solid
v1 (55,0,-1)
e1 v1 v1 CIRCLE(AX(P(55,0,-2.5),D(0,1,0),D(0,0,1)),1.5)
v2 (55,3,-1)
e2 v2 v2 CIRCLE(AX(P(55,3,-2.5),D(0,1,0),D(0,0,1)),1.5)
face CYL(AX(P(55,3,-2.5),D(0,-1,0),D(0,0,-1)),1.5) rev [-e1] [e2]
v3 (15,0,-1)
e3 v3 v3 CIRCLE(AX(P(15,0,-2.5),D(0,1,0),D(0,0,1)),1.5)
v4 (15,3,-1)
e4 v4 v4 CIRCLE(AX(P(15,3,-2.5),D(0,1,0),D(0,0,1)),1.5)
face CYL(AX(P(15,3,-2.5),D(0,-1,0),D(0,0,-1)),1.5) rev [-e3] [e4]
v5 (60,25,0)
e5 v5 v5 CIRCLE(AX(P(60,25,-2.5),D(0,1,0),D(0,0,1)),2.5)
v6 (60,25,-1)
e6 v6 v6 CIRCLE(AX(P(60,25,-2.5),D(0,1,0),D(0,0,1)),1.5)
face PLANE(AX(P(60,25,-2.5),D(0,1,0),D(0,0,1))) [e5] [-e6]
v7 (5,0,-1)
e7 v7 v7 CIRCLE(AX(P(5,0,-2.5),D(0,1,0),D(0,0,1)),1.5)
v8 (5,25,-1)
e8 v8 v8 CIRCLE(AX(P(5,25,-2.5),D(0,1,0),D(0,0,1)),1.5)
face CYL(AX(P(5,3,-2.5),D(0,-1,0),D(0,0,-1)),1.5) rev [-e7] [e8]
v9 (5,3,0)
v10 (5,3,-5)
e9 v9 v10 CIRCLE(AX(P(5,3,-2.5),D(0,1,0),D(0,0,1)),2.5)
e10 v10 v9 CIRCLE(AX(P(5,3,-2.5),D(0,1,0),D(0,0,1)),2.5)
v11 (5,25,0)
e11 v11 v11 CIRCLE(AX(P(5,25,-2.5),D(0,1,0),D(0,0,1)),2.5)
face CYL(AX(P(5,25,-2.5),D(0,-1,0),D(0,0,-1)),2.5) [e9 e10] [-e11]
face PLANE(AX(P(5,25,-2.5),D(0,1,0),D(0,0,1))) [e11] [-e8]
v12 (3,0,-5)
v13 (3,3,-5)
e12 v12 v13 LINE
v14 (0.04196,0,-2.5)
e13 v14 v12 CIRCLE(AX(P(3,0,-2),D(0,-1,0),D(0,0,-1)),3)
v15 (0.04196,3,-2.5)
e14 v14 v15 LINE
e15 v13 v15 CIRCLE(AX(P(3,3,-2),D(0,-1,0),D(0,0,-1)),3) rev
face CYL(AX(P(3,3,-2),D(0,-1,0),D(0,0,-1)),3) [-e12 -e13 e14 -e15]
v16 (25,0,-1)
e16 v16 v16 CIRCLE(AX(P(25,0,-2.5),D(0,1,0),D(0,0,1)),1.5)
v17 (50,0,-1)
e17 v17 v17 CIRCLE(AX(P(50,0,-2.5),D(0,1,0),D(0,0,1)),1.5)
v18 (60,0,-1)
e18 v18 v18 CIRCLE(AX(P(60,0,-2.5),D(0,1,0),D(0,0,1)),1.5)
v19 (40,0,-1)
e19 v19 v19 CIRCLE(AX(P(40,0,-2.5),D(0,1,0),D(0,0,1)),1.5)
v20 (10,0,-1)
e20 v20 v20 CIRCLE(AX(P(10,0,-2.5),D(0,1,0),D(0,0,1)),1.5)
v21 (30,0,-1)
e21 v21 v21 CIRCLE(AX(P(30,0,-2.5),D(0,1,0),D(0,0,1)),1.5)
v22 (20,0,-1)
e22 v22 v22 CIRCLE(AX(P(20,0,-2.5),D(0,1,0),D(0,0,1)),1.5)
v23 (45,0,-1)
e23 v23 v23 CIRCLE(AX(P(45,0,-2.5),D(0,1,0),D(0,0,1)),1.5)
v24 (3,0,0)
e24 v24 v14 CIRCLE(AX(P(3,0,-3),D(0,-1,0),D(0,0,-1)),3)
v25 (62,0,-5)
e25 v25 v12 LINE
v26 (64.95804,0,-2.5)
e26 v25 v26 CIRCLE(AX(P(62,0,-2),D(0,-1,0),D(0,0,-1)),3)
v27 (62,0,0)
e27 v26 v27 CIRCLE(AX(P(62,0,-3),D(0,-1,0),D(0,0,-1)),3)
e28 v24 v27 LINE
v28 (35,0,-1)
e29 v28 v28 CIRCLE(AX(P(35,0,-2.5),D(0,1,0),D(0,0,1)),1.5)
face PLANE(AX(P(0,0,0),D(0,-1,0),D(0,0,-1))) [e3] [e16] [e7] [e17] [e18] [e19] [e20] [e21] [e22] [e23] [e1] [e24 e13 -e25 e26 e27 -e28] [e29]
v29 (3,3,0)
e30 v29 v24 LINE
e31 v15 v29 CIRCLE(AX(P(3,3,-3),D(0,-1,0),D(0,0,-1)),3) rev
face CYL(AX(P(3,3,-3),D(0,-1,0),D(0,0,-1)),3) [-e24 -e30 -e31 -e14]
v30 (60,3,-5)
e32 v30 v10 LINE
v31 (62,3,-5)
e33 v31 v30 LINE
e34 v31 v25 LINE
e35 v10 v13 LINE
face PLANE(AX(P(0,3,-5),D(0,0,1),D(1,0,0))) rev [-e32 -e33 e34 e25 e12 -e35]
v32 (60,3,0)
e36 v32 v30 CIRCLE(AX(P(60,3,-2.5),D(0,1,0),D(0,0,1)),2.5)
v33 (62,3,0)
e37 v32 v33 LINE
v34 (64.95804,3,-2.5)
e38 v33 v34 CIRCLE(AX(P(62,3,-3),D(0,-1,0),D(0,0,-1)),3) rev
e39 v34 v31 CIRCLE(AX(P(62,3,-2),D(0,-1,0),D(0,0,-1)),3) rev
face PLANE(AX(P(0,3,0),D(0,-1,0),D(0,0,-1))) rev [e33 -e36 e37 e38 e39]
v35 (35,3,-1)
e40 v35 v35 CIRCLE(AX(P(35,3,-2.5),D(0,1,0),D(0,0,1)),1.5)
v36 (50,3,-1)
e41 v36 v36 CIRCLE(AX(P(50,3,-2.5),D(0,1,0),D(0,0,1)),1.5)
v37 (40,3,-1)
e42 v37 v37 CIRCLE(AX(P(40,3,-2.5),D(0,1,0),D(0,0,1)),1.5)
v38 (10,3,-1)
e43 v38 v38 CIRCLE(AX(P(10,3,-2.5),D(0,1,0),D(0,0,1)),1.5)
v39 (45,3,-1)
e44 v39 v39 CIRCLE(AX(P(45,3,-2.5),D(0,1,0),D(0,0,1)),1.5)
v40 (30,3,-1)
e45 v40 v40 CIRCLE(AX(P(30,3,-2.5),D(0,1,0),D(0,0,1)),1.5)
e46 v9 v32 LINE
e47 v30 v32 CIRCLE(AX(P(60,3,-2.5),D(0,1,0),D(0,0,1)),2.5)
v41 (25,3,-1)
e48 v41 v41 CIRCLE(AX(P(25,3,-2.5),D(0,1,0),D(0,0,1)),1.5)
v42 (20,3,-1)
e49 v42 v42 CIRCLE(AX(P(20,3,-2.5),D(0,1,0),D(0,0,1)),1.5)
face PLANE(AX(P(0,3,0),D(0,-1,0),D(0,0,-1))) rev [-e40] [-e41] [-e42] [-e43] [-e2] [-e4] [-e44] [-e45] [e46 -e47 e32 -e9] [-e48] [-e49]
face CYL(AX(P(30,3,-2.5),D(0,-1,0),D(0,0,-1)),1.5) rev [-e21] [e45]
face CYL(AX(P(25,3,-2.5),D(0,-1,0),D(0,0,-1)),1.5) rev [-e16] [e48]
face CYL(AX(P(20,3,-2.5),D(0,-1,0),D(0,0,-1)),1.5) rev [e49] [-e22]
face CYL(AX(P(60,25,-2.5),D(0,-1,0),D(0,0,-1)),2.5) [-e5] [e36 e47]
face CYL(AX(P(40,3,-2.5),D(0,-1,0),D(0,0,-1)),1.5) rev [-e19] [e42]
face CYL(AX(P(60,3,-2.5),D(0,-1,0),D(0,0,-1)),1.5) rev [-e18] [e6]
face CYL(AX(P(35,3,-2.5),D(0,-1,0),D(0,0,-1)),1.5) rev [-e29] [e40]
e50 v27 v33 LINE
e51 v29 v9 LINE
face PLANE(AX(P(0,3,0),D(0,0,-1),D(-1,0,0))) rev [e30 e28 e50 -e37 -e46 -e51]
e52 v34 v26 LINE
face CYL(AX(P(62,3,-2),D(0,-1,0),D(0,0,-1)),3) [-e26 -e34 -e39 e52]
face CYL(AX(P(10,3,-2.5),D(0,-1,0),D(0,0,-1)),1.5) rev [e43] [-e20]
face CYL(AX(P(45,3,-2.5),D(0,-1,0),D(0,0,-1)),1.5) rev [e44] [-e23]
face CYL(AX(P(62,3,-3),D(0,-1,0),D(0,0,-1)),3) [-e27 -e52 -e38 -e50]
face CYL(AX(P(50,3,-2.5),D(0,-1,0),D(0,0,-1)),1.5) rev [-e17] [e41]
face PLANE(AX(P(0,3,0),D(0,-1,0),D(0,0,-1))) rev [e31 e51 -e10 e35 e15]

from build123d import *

# Parameters (mm, degrees)
SKETCH1_W           = 65
SKETCH1_H           = 5
SKETCH1_R           = 1.5
BOSS_EXTRUDE1_DEPTH = 3
SKETCH2_R           = 2.5
SKETCH2_R_2         = 1.5
BOSS_EXTRUDE2_DEPTH = 22
FILLET1_R           = 3


with BuildPart() as part:
    # Sketch1 → Boss-Extrude1 (new body)
    with BuildSketch(Plane(origin=(0, 0, 0), x_dir=(1, 0, 0), z_dir=(0, 1, 0))):
        with Locations((32.5, 2.5)):
            Rectangle(SKETCH1_W, SKETCH1_H)
        with Locations(Location((5, 2.5, 0), (0, 0, 270))):
            Circle(SKETCH1_R, mode=Mode.SUBTRACT)
        with Locations(Location((10, 2.5, 0), (0, 0, 270))):
            Circle(SKETCH1_R, mode=Mode.SUBTRACT)
        with Locations(Location((15, 2.5, 0), (0, 0, 270))):
            Circle(SKETCH1_R, mode=Mode.SUBTRACT)
        with Locations(Location((20, 2.5, 0), (0, 0, 270))):
            Circle(SKETCH1_R, mode=Mode.SUBTRACT)
        with Locations(Location((25, 2.5, 0), (0, 0, 270))):
            Circle(SKETCH1_R, mode=Mode.SUBTRACT)
        with Locations(Location((30, 2.5, 0), (0, 0, 270))):
            Circle(SKETCH1_R, mode=Mode.SUBTRACT)
        with Locations(Location((35, 2.5, 0), (0, 0, 270))):
            Circle(SKETCH1_R, mode=Mode.SUBTRACT)
        with Locations(Location((40, 2.5, 0), (0, 0, 270))):
            Circle(SKETCH1_R, mode=Mode.SUBTRACT)
        with Locations(Location((45, 2.5, 0), (0, 0, 270))):
            Circle(SKETCH1_R, mode=Mode.SUBTRACT)
        with Locations(Location((50, 2.5, 0), (0, 0, 270))):
            Circle(SKETCH1_R, mode=Mode.SUBTRACT)
        with Locations(Location((55, 2.5, 0), (0, 0, 270))):
            Circle(SKETCH1_R, mode=Mode.SUBTRACT)
        with Locations(Location((60, 2.5, 0), (0, 0, 270))):
            Circle(SKETCH1_R, mode=Mode.SUBTRACT)
    extrude(amount=BOSS_EXTRUDE1_DEPTH)

    # Sketch2 → Boss-Extrude2 (add)
    # profile 1 of 2: a face of its own
    with BuildSketch(Plane(origin=(0, 3, 0), x_dir=(1, 0, 0), z_dir=(0, 1, 0))):
        with Locations(Location((5, 2.5, 0), (0, 0, 270))):
            Circle(SKETCH2_R)
        with Locations(Location((5, 2.5, 0), (0, 0, 270))):
            Circle(SKETCH2_R_2, mode=Mode.SUBTRACT)
    # profile 2 of 2: a face of its own
    with BuildSketch(Plane(origin=(0, 3, 0), x_dir=(1, 0, 0), z_dir=(0, 1, 0))):
        with Locations(Location((60, 2.5, 0), (0, 0, 270))):
            Circle(SKETCH2_R)
        with Locations(Location((60, 2.5, 0), (0, 0, 270))):
            Circle(SKETCH2_R_2, mode=Mode.SUBTRACT)
    extrude(amount=BOSS_EXTRUDE2_DEPTH)

    # Fillet1
    # the kernel refuses this fillet: 3 mm, written as the material it takes off along each edge
    with BuildSketch(Plane(origin=(65, -7.5, -5), x_dir=(-1, 0, 0), z_dir=(0, 1, 0)), Plane(origin=(0, -7.5, 0), x_dir=(1, 0, 0), z_dir=(0, 1, 0))) as fillet1_piece_1:
        with BuildLine():
            CenterArc((FILLET1_R, FILLET1_R), FILLET1_R, 180, 90)
            Line((0, FILLET1_R), (0, 0))
            Line((0, 0), (FILLET1_R, 0))
        make_face()
    extrude(amount=18, mode=Mode.SUBTRACT)
    with BuildSketch(Plane(origin=(65, -7.5, 0), x_dir=(-1, 0, 0), z_dir=(0, 1, 0)), Plane(origin=(0, -7.5, -5), x_dir=(1, 0, 0), z_dir=(0, 1, 0))) as fillet1_piece_2:
        with BuildLine():
            CenterArc((FILLET1_R, -FILLET1_R), FILLET1_R, 90, 90)
            Line((0, -FILLET1_R), (0, 0))
            Line((0, 0), (FILLET1_R, 0))
        make_face()
    extrude(amount=18, mode=Mode.SUBTRACT)


solid = part.part
